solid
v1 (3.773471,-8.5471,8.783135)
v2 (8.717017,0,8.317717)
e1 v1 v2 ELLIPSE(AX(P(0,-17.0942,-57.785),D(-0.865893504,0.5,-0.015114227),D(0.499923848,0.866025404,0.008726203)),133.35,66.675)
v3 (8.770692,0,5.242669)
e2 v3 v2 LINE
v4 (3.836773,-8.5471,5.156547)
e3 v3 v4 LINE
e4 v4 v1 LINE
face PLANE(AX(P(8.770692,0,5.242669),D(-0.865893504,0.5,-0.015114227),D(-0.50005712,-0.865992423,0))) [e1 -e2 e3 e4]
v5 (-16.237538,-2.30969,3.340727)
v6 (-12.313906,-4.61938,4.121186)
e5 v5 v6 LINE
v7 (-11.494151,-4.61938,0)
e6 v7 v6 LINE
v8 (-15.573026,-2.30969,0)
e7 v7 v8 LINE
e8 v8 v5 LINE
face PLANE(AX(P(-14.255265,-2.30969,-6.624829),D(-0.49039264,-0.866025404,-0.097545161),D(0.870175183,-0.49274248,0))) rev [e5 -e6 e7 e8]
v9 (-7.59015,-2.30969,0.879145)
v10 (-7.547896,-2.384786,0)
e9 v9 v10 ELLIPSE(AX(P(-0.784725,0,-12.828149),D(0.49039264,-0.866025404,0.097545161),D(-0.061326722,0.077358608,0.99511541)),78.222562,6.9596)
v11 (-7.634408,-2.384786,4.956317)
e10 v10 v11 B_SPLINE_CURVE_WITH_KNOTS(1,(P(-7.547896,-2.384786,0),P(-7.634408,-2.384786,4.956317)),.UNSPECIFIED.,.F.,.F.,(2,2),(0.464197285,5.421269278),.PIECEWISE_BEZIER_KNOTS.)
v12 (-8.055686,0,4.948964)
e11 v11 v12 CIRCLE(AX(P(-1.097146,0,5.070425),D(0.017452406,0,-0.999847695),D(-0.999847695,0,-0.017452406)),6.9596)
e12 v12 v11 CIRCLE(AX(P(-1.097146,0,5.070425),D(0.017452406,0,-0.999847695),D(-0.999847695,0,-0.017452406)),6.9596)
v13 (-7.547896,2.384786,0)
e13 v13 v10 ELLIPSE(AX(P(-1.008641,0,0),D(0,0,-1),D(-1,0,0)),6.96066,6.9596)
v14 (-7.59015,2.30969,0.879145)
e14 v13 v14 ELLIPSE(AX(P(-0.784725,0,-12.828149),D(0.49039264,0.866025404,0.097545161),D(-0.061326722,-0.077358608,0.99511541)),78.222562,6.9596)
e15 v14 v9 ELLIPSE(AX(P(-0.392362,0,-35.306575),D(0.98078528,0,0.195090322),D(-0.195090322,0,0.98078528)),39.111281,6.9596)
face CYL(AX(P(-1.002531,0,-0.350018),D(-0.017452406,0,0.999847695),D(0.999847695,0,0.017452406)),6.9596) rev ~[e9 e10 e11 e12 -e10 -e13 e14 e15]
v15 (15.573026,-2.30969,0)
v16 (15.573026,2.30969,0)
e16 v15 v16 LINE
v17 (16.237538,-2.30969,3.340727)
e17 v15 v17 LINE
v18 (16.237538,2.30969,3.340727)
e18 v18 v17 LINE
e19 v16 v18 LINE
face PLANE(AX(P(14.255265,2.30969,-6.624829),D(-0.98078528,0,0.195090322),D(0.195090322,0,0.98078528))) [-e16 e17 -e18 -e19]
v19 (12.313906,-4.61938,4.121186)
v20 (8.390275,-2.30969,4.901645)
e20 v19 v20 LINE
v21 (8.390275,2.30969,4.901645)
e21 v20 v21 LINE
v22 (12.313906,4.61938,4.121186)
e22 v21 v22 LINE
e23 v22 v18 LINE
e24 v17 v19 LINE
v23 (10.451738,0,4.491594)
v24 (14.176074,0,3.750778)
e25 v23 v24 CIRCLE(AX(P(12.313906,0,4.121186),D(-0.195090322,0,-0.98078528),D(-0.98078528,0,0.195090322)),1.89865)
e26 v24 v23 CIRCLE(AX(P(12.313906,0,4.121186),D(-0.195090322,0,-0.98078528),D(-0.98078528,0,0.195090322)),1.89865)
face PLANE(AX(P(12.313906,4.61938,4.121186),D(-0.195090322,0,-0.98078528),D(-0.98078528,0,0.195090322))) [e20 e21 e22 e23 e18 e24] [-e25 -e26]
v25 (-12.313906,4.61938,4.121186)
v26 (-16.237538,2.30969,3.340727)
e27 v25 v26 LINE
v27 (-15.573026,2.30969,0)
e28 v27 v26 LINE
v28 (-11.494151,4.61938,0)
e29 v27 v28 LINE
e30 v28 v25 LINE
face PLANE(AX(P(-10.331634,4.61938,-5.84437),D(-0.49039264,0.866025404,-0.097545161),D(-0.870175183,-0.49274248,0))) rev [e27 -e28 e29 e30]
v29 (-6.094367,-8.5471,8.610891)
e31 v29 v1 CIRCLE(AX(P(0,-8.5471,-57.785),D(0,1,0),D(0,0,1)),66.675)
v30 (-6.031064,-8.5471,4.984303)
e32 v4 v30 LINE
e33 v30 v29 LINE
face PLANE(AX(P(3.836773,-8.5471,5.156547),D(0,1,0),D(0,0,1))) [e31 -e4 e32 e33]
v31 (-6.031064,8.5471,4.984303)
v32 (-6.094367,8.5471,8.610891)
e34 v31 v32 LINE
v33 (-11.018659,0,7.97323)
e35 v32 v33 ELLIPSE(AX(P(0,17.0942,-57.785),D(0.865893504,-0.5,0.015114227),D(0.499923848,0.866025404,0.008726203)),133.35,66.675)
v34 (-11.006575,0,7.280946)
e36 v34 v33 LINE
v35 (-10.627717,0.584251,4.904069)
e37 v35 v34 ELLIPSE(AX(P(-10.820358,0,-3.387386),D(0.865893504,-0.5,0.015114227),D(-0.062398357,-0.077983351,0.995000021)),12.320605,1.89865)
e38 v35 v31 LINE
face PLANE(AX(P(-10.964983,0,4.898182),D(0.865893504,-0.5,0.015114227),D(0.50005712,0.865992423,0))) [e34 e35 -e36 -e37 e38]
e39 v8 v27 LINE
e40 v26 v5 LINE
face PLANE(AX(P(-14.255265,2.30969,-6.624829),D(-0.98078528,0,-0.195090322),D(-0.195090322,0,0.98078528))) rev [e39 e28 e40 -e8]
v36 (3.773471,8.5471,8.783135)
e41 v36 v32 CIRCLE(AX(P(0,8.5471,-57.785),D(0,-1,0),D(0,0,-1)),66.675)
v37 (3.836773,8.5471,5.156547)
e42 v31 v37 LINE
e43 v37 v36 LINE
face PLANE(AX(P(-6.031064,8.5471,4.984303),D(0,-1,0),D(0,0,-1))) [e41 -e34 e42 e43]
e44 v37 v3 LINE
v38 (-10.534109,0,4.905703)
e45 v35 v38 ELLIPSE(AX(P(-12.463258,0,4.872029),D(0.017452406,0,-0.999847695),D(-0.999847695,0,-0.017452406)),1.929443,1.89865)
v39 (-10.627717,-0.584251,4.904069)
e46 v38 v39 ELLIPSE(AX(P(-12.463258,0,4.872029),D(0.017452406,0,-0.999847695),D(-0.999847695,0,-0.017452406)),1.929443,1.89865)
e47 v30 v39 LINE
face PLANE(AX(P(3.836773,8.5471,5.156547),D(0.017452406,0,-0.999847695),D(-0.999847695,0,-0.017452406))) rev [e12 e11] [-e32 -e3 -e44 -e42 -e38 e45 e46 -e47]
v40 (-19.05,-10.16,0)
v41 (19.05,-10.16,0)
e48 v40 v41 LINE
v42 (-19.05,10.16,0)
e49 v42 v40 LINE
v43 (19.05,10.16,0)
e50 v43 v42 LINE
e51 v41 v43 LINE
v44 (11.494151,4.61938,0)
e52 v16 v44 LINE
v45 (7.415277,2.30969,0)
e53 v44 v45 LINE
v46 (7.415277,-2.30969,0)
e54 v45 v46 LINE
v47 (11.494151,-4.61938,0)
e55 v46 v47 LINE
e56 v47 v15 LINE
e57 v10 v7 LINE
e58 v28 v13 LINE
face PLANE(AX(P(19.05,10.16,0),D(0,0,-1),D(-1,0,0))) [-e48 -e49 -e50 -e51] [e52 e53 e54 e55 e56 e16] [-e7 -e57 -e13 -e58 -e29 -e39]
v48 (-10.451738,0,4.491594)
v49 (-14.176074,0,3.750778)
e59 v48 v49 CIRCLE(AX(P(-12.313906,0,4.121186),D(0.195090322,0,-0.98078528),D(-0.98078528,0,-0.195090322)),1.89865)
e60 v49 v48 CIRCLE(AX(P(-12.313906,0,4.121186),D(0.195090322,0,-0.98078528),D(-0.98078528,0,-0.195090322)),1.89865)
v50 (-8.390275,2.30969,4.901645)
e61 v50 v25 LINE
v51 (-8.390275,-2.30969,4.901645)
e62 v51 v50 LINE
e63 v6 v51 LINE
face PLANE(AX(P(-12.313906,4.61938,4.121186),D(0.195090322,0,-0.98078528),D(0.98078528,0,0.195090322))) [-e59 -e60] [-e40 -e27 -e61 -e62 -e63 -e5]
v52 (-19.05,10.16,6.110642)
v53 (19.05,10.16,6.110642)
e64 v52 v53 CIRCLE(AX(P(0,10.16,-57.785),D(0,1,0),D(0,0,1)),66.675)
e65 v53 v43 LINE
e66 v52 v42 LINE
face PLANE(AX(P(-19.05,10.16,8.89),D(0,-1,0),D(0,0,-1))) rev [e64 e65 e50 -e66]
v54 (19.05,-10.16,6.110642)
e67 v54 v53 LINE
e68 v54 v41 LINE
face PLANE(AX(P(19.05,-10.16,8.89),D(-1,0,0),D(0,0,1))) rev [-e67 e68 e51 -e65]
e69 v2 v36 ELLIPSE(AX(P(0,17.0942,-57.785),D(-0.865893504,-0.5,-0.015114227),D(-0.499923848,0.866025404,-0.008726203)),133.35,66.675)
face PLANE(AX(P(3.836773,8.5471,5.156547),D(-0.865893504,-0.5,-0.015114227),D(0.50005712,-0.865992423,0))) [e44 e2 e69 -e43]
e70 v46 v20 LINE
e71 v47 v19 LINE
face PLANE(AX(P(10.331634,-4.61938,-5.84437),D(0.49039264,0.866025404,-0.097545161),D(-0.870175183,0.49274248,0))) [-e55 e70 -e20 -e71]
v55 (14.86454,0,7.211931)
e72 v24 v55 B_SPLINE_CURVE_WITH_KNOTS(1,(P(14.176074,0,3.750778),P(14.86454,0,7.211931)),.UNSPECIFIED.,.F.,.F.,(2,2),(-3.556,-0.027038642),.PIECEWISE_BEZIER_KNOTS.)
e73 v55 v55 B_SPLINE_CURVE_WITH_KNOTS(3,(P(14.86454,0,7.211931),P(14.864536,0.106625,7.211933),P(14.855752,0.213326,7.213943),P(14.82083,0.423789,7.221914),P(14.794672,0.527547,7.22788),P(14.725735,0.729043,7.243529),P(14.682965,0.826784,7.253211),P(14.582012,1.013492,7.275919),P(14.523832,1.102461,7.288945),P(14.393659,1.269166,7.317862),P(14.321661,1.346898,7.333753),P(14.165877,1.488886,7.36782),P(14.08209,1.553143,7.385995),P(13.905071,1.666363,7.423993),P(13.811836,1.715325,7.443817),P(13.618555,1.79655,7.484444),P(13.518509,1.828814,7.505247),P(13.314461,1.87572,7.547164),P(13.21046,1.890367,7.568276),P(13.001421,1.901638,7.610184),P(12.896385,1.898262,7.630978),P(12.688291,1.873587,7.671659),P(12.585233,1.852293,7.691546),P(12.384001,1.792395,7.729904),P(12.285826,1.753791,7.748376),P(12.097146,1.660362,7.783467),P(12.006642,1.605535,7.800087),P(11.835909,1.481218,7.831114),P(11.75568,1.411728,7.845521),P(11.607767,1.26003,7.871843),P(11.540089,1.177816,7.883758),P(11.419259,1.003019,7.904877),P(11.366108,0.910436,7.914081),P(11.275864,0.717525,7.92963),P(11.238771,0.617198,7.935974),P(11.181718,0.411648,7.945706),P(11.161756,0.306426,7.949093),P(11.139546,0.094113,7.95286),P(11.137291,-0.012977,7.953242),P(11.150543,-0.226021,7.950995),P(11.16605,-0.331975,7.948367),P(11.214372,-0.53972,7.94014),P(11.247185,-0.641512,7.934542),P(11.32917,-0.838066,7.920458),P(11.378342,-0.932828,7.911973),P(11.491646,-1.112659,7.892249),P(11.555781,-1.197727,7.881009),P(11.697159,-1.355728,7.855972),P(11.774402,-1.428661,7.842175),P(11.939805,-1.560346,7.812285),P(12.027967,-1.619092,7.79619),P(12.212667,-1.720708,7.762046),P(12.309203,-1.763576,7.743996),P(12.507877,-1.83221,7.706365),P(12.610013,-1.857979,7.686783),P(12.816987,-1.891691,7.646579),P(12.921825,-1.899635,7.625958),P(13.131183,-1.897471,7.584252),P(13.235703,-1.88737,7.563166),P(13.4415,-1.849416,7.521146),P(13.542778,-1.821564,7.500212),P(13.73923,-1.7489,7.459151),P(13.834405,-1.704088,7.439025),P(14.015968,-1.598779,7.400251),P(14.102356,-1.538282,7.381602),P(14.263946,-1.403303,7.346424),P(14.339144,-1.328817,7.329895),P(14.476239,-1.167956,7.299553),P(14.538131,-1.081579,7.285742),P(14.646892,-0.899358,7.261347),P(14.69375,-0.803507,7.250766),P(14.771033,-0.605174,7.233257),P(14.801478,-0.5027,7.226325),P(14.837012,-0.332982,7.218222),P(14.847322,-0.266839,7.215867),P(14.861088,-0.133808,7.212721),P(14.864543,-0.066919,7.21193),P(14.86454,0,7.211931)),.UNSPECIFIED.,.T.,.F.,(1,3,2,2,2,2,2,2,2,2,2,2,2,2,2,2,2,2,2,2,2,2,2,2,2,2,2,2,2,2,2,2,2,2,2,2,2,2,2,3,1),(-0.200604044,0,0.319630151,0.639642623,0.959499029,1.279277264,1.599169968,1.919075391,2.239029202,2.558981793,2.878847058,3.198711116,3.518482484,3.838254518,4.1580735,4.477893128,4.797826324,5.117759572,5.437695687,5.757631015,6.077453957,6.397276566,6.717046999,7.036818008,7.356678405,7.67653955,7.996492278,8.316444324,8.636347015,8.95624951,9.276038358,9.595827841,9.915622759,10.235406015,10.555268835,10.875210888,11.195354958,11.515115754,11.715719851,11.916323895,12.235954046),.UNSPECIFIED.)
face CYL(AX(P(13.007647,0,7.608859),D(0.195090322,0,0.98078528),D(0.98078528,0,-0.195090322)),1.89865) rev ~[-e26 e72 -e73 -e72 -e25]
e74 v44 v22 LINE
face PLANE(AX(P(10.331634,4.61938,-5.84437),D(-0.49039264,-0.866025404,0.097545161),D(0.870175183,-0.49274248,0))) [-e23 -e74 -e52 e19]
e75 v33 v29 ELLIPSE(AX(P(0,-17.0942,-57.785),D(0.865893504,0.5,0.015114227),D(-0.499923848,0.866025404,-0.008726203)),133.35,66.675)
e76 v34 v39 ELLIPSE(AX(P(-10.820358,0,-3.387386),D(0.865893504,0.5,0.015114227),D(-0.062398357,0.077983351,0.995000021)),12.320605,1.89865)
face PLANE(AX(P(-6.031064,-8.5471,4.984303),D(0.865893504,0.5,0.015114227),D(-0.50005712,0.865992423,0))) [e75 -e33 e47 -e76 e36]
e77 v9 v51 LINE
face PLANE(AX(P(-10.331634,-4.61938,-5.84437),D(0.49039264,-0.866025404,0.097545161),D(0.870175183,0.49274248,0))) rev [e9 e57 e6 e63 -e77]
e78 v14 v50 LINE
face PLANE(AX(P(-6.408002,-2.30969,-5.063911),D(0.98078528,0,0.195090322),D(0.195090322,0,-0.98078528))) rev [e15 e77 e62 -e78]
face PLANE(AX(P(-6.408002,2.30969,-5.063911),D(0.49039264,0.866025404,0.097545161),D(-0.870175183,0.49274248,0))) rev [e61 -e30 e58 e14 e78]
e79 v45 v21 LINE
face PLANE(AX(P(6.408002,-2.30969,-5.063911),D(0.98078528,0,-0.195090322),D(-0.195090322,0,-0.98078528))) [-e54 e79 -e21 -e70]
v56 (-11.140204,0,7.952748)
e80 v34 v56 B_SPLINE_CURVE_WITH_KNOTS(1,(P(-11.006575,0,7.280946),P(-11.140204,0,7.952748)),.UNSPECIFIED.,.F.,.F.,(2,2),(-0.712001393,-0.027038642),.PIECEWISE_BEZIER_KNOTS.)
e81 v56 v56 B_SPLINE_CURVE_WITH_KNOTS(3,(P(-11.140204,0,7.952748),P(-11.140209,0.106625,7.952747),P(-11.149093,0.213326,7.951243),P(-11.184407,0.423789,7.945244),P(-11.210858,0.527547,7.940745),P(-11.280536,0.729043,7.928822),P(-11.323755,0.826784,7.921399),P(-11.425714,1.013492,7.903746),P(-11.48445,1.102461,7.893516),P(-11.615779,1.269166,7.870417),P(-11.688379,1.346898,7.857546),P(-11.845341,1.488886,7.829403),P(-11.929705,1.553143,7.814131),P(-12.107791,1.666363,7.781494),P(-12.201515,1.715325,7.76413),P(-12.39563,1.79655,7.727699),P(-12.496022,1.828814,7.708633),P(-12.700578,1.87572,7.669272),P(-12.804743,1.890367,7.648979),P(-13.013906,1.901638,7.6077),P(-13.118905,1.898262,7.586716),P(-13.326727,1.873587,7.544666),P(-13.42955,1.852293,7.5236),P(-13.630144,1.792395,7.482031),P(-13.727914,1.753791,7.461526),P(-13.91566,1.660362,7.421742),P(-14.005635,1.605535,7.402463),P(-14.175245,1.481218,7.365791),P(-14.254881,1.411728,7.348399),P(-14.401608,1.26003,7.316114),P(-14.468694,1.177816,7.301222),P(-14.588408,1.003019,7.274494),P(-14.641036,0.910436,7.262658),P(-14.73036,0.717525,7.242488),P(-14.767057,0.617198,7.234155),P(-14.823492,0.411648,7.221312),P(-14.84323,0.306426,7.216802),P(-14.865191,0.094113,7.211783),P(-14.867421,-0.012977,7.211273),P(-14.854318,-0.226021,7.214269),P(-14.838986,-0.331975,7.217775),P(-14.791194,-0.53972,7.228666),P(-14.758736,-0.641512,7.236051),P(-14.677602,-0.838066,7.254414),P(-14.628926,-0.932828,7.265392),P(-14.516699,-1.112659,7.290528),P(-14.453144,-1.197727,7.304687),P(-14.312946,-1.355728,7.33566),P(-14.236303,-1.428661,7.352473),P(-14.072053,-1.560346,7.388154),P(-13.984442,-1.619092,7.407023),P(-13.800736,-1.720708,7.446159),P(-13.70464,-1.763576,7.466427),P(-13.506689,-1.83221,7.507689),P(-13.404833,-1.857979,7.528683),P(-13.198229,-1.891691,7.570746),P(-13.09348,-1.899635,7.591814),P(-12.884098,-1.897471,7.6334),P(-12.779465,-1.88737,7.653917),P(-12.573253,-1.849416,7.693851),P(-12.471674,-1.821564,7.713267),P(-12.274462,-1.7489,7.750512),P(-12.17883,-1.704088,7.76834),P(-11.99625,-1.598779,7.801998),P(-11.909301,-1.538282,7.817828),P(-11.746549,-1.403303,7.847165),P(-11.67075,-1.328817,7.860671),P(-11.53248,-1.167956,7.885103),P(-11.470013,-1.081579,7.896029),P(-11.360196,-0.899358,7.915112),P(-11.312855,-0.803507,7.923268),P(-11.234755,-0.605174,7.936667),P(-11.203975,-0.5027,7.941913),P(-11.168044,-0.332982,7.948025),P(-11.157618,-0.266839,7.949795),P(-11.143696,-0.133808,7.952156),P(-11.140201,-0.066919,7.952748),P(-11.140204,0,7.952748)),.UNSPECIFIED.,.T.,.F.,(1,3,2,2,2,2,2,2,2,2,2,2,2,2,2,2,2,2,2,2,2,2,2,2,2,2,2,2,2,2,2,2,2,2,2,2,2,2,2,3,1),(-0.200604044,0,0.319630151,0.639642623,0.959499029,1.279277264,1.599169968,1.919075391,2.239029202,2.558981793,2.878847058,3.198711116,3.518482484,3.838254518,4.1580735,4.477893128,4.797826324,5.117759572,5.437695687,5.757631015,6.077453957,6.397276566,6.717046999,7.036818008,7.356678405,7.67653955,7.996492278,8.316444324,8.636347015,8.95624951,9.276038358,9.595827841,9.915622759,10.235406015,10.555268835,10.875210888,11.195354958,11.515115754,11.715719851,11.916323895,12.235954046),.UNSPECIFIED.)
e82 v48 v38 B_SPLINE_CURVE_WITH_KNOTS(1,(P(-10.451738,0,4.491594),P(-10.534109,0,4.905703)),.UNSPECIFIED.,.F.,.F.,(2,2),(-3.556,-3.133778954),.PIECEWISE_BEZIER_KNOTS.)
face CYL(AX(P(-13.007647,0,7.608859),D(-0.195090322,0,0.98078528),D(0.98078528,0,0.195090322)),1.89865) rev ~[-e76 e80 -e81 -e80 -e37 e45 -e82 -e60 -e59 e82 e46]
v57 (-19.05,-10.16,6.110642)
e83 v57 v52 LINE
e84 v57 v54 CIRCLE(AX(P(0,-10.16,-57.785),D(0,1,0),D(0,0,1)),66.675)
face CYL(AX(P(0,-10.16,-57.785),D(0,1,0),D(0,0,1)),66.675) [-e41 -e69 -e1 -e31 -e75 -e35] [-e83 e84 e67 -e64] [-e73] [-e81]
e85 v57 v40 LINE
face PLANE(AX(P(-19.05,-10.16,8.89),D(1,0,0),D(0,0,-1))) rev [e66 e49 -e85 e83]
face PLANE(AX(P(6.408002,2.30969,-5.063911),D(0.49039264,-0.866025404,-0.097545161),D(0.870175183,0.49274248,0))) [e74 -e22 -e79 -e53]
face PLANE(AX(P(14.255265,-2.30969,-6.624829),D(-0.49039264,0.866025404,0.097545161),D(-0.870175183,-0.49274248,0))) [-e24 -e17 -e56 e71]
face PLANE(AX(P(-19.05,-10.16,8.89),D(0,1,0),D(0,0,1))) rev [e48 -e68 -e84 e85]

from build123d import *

# Parameters (mm, degrees)
SKETCH1_W           = 38.1
SKETCH1_H           = 20.32
BOSS_EXTRUDE1_DEPTH = 8.89
CUT_EXTRUDE3_START  = -20.32
CUT_EXTRUDE3_DEPTH  = 20.32
CUT_EXTRUDE5_DEPTH  = 42.856889745
SKETCH15_R          = 6.9596
CUT_EXTRUDE7_DEPTH  = 31.005753887
CUT_EXTRUDE8_DEPTH  = 3.81


# Read off the part's stored shape, not the designer's step: Cut-Extrude3
with BuildPart() as part:
    # Sketch1 → Boss-Extrude1 (new body)
    with BuildSketch(Plane.XY):
        Rectangle(SKETCH1_W, SKETCH1_H)
    extrude(amount=BOSS_EXTRUDE1_DEPTH)

    # Cut-Extrude3 outline → Cut-Extrude3 (cut)
    with BuildSketch(Plane(origin=(0, 10.16, 0), x_dir=(1, 0, 0), z_dir=(0, 1, 0)).offset(CUT_EXTRUDE3_START)):
        with BuildLine():
            ThreePointArc((19.05, -6.110642457), (9.62584189, -8.191501824), (0, -8.89))
            Line((0, -8.89), (19.05, -8.89))
            Line((19.05, -8.89), (19.05, -6.110642457))
        make_face()
        with BuildLine():
            ThreePointArc((0, -8.89), (-9.62584189, -8.191501824), (-19.05, -6.110642457))
            Line((-19.05, -6.110642457), (-19.05, -8.89))
            Line((-19.05, -8.89), (0, -8.89))
        make_face()
    extrude(amount=CUT_EXTRUDE3_DEPTH, mode=Mode.SUBTRACT)

    # Sketch12 → #6 Clearance Hole2 (revolve, cut)
    with BuildSketch(Plane(origin=(13.00764722, 0, 7.608858571), x_dir=(0.9807852804032313, 0, -0.19509032201612442), z_dir=(0, 1, 0))):
        Polygon((0, 0), (0, 13.840824014), (1.89865, 12.7), (1.89865, 0), align=None)
    f_6_clearance_hole2 = revolve(axis=Axis((14.246470765, 0, 13.836845101), (-0.19509032201612442, 0, -0.9807852804032313)), mode=Mode.SUBTRACT)

    # Sketch14 → Cut-Extrude5 (cut, through all)
    with BuildSketch(Plane(origin=(12.313906035, -17.145, 4.121186114), x_dir=(-0.9807852804032313, 0, 0.19509032201612445), z_dir=(-0.19509032201612445, 0, -0.9807852804032313))):
        Polygon((0, 21.764379504), (-4.0005, 19.454689752), (-4.0005, 14.835310248), (0, 12.525620496), (4.0005, 14.835310248), (4.0005, 19.454689752), align=None)
    cut_extrude5 = extrude(amount=CUT_EXTRUDE5_DEPTH, mode=Mode.SUBTRACT)

    # Mirror1: #6 Clearance Hole2, Cut-Extrude5 across plane
    add(f_6_clearance_hole2.mirror(Plane(origin=(0, 0, 0), x_dir=(0, 0, 1), z_dir=(1, 0, 0))), mode=Mode.SUBTRACT)
    add(cut_extrude5.mirror(Plane(origin=(0, 0, 0), x_dir=(0, 0, 1), z_dir=(1, 0, 0))), mode=Mode.SUBTRACT)

    # Sketch15 → Cut-Extrude7 (cut, through all)
    with BuildSketch(Plane(origin=(-1.163639199, -10.16, 8.879845075), x_dir=(-0.9998476951563913, 0, -0.017452406437284837), z_dir=(0.017452406437284837, 0, -0.9998476951563913))):
        with Locations(Location((0, 10.16, 0), (0, 0, 180))):
            Circle(SKETCH15_R)
    extrude(amount=CUT_EXTRUDE7_DEPTH, mode=Mode.SUBTRACT)

    # Sketch16 → Cut-Extrude8 (cut)
    with BuildSketch(Plane(origin=(-1.163639199, -10.16, 8.879845075), x_dir=(-0.9998476951563913, 0, -0.017452406437284837), z_dir=(0.017452406437284837, 0, -0.9998476951563913))):
        Polygon((-4.934670486, 18.7071), (-9.869340972, 10.16), (-4.934670486, 1.6129), (4.934670486, 1.6129), (9.869340972, 10.16), (4.934670486, 18.7071), align=None)
    extrude(amount=CUT_EXTRUDE8_DEPTH, mode=Mode.SUBTRACT)


solid = part.part
